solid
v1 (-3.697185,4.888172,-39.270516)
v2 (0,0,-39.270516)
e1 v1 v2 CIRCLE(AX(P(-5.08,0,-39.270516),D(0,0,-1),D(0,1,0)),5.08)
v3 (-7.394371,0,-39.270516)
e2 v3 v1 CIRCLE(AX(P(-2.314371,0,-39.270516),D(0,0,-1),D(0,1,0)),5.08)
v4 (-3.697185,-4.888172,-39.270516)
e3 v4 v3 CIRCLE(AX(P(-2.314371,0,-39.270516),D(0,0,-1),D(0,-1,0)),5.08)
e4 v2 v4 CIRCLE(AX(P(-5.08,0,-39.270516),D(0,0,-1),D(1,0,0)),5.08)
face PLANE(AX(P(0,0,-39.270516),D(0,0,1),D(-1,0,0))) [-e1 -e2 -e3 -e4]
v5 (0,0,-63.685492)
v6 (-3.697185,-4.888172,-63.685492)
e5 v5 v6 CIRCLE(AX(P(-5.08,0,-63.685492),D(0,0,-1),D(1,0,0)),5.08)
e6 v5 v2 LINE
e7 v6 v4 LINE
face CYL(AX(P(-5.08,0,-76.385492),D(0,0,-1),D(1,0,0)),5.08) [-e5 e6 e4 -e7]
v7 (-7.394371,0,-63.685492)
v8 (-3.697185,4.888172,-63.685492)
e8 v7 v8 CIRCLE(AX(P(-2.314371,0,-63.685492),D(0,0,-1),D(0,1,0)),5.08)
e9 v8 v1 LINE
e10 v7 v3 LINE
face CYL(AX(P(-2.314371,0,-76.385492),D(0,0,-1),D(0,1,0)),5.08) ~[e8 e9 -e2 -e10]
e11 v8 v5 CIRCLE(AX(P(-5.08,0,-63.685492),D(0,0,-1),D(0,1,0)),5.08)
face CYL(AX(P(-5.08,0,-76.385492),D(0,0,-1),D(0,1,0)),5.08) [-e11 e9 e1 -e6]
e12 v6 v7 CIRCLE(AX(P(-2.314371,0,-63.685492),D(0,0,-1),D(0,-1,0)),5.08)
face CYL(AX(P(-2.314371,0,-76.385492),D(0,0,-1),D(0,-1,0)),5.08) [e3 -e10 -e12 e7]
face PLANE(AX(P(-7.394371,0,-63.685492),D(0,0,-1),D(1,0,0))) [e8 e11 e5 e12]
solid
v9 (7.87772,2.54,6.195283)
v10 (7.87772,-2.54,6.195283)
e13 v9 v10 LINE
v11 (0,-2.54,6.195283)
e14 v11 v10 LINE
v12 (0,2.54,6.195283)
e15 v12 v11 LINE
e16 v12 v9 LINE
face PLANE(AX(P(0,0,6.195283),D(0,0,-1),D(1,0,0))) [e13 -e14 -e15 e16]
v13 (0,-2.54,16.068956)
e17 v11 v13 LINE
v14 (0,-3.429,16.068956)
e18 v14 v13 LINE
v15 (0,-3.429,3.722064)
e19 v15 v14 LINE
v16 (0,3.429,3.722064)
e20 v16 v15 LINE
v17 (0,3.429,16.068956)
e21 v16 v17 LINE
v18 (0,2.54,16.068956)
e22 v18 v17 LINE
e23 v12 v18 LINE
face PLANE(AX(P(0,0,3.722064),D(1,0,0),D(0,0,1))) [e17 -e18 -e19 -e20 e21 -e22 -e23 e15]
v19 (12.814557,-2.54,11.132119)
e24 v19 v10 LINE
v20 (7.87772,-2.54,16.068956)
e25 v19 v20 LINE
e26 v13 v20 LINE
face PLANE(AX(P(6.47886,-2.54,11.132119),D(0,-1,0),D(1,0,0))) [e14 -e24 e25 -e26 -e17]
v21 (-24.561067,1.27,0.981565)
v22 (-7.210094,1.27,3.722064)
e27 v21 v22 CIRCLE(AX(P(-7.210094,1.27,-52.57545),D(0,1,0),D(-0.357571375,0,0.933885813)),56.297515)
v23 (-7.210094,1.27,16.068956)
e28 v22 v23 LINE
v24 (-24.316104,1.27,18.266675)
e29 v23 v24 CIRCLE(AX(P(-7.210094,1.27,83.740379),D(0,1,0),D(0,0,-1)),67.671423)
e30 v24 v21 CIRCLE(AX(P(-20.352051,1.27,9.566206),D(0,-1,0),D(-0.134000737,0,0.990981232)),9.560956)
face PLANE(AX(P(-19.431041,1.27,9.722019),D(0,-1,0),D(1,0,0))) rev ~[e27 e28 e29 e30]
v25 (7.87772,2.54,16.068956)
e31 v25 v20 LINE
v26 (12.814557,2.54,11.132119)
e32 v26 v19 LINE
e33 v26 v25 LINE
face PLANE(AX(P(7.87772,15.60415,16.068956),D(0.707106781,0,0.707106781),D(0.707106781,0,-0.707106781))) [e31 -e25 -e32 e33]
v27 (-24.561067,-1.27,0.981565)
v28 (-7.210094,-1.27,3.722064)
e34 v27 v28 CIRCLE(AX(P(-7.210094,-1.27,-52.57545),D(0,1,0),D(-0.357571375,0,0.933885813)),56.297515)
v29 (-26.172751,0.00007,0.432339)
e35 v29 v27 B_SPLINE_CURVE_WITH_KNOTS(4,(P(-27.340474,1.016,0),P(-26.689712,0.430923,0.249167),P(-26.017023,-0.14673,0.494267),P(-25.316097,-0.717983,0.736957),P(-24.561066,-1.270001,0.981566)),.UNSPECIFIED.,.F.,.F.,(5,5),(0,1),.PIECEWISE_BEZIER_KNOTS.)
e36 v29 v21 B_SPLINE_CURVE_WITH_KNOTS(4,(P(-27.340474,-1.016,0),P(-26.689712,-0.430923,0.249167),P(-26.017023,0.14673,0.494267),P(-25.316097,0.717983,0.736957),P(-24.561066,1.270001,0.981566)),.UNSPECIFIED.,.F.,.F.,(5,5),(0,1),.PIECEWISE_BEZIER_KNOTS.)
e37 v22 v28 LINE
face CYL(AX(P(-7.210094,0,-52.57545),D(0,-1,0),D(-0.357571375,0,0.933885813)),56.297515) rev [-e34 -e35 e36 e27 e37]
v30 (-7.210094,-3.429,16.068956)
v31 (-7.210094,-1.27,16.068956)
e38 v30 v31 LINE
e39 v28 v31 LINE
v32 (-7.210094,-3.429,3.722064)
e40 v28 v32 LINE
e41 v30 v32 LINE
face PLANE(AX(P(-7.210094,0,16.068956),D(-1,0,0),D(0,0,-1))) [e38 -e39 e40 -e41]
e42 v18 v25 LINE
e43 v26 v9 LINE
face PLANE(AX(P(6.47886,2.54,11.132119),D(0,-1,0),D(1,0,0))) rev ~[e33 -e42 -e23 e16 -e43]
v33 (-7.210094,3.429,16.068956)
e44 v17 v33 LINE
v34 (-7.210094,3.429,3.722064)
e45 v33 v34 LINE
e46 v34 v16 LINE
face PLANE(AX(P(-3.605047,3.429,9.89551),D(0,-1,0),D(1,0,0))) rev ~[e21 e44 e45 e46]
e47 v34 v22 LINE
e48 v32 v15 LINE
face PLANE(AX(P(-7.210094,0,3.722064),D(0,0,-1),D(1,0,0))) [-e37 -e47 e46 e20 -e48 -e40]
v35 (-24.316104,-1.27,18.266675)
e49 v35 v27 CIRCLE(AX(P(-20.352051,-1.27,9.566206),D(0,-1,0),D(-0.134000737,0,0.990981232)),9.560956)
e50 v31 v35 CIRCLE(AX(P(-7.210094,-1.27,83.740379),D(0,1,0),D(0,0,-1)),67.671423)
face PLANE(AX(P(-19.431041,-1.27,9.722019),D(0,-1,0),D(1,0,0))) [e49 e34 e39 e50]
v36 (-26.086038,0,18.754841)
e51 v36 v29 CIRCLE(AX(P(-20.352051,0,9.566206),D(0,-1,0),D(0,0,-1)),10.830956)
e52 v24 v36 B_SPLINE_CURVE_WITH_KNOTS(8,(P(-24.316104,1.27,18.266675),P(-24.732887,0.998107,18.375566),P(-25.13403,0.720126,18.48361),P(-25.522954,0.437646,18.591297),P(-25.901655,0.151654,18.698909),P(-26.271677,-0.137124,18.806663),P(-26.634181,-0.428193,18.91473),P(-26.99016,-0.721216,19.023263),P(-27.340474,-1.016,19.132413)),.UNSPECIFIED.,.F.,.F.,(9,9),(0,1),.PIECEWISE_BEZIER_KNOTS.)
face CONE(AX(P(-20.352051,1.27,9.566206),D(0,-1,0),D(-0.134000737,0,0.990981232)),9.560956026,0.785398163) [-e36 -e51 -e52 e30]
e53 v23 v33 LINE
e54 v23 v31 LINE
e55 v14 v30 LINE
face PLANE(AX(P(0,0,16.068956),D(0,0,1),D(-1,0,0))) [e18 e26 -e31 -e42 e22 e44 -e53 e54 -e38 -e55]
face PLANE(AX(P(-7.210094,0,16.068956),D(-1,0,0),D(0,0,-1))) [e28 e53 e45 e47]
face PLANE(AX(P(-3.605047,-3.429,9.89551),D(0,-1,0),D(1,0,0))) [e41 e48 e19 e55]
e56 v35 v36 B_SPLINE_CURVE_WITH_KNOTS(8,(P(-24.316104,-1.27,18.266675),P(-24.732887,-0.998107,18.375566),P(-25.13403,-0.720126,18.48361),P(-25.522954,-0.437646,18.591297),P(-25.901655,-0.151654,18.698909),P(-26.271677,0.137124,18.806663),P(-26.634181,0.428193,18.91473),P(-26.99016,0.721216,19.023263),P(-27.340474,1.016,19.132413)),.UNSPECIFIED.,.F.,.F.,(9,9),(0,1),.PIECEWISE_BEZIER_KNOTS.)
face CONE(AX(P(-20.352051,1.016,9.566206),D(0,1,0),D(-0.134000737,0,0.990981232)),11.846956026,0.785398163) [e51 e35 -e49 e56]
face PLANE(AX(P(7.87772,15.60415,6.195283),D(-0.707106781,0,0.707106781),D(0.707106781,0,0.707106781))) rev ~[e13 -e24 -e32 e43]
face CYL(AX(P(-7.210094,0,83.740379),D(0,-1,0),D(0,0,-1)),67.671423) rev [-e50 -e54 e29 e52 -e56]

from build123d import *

# Parameters (mm, degrees)
F2_DEPTH    = 5.08
F3_T1_DEPTH = 49.8149751961
F5_DEPTH    = 3.429
F6_DEPTH    = 1.27
F7_T2_ANGLE = 164.598317353
F7_T4_ANGLE = 164.598317353
F1_W        = 12.957720086
F1_H        = 9.8736736098
F8_DEPTH    = 2.54
F9_T1_DEPTH = 31.2082991577


# Not quite as in the source:
# - a fillet or chamfer that OpenCascade refuses, or shapes differently, is made with other operations: its cross-section is extruded or revolved along the edge and cut away or added
# - the program builds the solid bodies; features that only make, move or delete a surface that nothing else refers to are left out


with BuildPart() as f2:
    # F0 (on Front) → F2 (new body, symmetric)
    with BuildSketch(Plane.XZ):
        Polygon((-3.9172582328, -39.270516485), (-7.3943706229, -39.270516485), (-7.3943706229, -63.6854916811), (0, -63.6854916811), (0, -39.270516485), align=None)
    extrude(amount=F2_DEPTH, both=True)

    # F3: fillet of radius 5.08 on 4 edges, made by hand

    # F3_s2 → F3_t1 (cut)
    with BuildSketch(Plane.XY.offset(-76.3854916811)):
        with BuildLine():
            ThreePointArc((-2.3143706229, -5.08), (-5.9064730714, -3.5921024484), (-7.3943706229, 0))
            Line((-7.3943706229, 0), (-7.3943706229, -5.08))
            Line((-7.3943706229, -5.08), (-2.3143706229, -5.08))
        make_face()
        with BuildLine():
            ThreePointArc((0, 0), (-1.4878975516, -3.5921024484), (-5.08, -5.08))
            Line((-5.08, -5.08), (0, -5.08))
            Line((0, -5.08), (0, 0))
        make_face()
        with BuildLine():
            ThreePointArc((-5.08, 5.08), (-1.4878975516, 3.5921024484), (0, 0))
            Line((0, 0), (0, 5.08))
            Line((0, 5.08), (-5.08, 5.08))
        make_face()
        with BuildLine():
            ThreePointArc((-2.3143706229, 5.08), (-5.9064730714, 3.5921024484), (-7.3943706229, 0))
            Line((-7.3943706229, 0), (-7.3943706229, 5.08))
            Line((-7.3943706229, 5.08), (-2.3143706229, 5.08))
        make_face()
    extrude(amount=F3_T1_DEPTH, mode=Mode.SUBTRACT)


with BuildPart() as f5:
    # F1 (on Front) → F5 (new body, symmetric)
    with BuildSketch(Plane.XZ):
        Polygon((-7.210094016, 16.0689561734), (-7.210094016, 3.7220644299), (0, 3.7220644299), (0, 6.1952825636), (0, 16.0689561734), align=None)
    extrude(amount=F5_DEPTH, both=True)

    # F1 (on Front) → F6 (join, symmetric)
    with BuildSketch(Plane.XZ):
        with BuildLine():
            ThreePointArc((-27.3404738286, 0), (-17.4458885018, 2.7837284893), (-7.210094016, 3.7220644299))
            Line((-7.210094016, 3.7220644299), (-7.210094016, 16.0689561734))
            ThreePointArc((-7.210094016, 16.0689561734), (-17.3911666381, 16.8392039186), (-27.3404738286, 19.1324129701))
            ThreePointArc((-27.3404738286, 19.1324129701), (-32.1990065296, 9.566206485), (-27.3404738286, 0))
        make_face()
    extrude(amount=F6_DEPTH, both=True)

    # F7: chamfer of 2.286 on 2 edges, made by hand

    # F7_s1 → F7_t2 (revolve, cut)
    with BuildSketch(Plane(origin=(-18.7162873139, 0, -2.5308211801), x_dir=(0, 1, 0), z_dir=(0.9909812322, 0, 0.1340007369))):
        Polygon((1.016, 24.0540768802), (-1.27, 21.7680768802), (-1.27, 24.0540768802), align=None)
    revolve(axis=Axis((-20.3520505033, -1.27, 9.566206485), (0, -1, 0)), revolution_arc=F7_T2_ANGLE, mode=Mode.SUBTRACT)

    # F7_s3 → F7_t4 (revolve, cut)
    with BuildSketch(Plane(origin=(-18.7162873139, 0, -2.5308211801), x_dir=(0, 1, 0), z_dir=(0.9909812322, 0, 0.1340007369))):
        Polygon((1.27, 21.7680768802), (-1.016, 24.0540768802), (1.27, 24.0540768802), align=None)
    revolve(axis=Axis((-20.3520505033, 1.27, 9.566206485), (0, -1, 0)), revolution_arc=F7_T4_ANGLE, mode=Mode.SUBTRACT)

    # F1 (on Front) → F8 (join, symmetric)
    with BuildSketch(Plane.XZ):
        with Locations((6.478860043, 11.1321193685)):
            Rectangle(F1_W, F1_H)
    extrude(amount=F8_DEPTH, both=True)

    # F9: chamfer of 5.08 on 2 edges, made by hand

    # F9_s2 → F9_t1 (cut)
    with BuildSketch(Plane.XZ.offset(-15.6041495789)):
        Polygon((7.877720086, 16.0689561734), (12.957720086, 10.9889561734), (12.957720086, 16.0689561734), align=None)
        Polygon((7.877720086, 6.1952825636), (12.957720086, 11.2752825636), (12.957720086, 6.1952825636), align=None)
    extrude(amount=F9_T1_DEPTH, mode=Mode.SUBTRACT)


solid = Compound([f2.part, f5.part])
